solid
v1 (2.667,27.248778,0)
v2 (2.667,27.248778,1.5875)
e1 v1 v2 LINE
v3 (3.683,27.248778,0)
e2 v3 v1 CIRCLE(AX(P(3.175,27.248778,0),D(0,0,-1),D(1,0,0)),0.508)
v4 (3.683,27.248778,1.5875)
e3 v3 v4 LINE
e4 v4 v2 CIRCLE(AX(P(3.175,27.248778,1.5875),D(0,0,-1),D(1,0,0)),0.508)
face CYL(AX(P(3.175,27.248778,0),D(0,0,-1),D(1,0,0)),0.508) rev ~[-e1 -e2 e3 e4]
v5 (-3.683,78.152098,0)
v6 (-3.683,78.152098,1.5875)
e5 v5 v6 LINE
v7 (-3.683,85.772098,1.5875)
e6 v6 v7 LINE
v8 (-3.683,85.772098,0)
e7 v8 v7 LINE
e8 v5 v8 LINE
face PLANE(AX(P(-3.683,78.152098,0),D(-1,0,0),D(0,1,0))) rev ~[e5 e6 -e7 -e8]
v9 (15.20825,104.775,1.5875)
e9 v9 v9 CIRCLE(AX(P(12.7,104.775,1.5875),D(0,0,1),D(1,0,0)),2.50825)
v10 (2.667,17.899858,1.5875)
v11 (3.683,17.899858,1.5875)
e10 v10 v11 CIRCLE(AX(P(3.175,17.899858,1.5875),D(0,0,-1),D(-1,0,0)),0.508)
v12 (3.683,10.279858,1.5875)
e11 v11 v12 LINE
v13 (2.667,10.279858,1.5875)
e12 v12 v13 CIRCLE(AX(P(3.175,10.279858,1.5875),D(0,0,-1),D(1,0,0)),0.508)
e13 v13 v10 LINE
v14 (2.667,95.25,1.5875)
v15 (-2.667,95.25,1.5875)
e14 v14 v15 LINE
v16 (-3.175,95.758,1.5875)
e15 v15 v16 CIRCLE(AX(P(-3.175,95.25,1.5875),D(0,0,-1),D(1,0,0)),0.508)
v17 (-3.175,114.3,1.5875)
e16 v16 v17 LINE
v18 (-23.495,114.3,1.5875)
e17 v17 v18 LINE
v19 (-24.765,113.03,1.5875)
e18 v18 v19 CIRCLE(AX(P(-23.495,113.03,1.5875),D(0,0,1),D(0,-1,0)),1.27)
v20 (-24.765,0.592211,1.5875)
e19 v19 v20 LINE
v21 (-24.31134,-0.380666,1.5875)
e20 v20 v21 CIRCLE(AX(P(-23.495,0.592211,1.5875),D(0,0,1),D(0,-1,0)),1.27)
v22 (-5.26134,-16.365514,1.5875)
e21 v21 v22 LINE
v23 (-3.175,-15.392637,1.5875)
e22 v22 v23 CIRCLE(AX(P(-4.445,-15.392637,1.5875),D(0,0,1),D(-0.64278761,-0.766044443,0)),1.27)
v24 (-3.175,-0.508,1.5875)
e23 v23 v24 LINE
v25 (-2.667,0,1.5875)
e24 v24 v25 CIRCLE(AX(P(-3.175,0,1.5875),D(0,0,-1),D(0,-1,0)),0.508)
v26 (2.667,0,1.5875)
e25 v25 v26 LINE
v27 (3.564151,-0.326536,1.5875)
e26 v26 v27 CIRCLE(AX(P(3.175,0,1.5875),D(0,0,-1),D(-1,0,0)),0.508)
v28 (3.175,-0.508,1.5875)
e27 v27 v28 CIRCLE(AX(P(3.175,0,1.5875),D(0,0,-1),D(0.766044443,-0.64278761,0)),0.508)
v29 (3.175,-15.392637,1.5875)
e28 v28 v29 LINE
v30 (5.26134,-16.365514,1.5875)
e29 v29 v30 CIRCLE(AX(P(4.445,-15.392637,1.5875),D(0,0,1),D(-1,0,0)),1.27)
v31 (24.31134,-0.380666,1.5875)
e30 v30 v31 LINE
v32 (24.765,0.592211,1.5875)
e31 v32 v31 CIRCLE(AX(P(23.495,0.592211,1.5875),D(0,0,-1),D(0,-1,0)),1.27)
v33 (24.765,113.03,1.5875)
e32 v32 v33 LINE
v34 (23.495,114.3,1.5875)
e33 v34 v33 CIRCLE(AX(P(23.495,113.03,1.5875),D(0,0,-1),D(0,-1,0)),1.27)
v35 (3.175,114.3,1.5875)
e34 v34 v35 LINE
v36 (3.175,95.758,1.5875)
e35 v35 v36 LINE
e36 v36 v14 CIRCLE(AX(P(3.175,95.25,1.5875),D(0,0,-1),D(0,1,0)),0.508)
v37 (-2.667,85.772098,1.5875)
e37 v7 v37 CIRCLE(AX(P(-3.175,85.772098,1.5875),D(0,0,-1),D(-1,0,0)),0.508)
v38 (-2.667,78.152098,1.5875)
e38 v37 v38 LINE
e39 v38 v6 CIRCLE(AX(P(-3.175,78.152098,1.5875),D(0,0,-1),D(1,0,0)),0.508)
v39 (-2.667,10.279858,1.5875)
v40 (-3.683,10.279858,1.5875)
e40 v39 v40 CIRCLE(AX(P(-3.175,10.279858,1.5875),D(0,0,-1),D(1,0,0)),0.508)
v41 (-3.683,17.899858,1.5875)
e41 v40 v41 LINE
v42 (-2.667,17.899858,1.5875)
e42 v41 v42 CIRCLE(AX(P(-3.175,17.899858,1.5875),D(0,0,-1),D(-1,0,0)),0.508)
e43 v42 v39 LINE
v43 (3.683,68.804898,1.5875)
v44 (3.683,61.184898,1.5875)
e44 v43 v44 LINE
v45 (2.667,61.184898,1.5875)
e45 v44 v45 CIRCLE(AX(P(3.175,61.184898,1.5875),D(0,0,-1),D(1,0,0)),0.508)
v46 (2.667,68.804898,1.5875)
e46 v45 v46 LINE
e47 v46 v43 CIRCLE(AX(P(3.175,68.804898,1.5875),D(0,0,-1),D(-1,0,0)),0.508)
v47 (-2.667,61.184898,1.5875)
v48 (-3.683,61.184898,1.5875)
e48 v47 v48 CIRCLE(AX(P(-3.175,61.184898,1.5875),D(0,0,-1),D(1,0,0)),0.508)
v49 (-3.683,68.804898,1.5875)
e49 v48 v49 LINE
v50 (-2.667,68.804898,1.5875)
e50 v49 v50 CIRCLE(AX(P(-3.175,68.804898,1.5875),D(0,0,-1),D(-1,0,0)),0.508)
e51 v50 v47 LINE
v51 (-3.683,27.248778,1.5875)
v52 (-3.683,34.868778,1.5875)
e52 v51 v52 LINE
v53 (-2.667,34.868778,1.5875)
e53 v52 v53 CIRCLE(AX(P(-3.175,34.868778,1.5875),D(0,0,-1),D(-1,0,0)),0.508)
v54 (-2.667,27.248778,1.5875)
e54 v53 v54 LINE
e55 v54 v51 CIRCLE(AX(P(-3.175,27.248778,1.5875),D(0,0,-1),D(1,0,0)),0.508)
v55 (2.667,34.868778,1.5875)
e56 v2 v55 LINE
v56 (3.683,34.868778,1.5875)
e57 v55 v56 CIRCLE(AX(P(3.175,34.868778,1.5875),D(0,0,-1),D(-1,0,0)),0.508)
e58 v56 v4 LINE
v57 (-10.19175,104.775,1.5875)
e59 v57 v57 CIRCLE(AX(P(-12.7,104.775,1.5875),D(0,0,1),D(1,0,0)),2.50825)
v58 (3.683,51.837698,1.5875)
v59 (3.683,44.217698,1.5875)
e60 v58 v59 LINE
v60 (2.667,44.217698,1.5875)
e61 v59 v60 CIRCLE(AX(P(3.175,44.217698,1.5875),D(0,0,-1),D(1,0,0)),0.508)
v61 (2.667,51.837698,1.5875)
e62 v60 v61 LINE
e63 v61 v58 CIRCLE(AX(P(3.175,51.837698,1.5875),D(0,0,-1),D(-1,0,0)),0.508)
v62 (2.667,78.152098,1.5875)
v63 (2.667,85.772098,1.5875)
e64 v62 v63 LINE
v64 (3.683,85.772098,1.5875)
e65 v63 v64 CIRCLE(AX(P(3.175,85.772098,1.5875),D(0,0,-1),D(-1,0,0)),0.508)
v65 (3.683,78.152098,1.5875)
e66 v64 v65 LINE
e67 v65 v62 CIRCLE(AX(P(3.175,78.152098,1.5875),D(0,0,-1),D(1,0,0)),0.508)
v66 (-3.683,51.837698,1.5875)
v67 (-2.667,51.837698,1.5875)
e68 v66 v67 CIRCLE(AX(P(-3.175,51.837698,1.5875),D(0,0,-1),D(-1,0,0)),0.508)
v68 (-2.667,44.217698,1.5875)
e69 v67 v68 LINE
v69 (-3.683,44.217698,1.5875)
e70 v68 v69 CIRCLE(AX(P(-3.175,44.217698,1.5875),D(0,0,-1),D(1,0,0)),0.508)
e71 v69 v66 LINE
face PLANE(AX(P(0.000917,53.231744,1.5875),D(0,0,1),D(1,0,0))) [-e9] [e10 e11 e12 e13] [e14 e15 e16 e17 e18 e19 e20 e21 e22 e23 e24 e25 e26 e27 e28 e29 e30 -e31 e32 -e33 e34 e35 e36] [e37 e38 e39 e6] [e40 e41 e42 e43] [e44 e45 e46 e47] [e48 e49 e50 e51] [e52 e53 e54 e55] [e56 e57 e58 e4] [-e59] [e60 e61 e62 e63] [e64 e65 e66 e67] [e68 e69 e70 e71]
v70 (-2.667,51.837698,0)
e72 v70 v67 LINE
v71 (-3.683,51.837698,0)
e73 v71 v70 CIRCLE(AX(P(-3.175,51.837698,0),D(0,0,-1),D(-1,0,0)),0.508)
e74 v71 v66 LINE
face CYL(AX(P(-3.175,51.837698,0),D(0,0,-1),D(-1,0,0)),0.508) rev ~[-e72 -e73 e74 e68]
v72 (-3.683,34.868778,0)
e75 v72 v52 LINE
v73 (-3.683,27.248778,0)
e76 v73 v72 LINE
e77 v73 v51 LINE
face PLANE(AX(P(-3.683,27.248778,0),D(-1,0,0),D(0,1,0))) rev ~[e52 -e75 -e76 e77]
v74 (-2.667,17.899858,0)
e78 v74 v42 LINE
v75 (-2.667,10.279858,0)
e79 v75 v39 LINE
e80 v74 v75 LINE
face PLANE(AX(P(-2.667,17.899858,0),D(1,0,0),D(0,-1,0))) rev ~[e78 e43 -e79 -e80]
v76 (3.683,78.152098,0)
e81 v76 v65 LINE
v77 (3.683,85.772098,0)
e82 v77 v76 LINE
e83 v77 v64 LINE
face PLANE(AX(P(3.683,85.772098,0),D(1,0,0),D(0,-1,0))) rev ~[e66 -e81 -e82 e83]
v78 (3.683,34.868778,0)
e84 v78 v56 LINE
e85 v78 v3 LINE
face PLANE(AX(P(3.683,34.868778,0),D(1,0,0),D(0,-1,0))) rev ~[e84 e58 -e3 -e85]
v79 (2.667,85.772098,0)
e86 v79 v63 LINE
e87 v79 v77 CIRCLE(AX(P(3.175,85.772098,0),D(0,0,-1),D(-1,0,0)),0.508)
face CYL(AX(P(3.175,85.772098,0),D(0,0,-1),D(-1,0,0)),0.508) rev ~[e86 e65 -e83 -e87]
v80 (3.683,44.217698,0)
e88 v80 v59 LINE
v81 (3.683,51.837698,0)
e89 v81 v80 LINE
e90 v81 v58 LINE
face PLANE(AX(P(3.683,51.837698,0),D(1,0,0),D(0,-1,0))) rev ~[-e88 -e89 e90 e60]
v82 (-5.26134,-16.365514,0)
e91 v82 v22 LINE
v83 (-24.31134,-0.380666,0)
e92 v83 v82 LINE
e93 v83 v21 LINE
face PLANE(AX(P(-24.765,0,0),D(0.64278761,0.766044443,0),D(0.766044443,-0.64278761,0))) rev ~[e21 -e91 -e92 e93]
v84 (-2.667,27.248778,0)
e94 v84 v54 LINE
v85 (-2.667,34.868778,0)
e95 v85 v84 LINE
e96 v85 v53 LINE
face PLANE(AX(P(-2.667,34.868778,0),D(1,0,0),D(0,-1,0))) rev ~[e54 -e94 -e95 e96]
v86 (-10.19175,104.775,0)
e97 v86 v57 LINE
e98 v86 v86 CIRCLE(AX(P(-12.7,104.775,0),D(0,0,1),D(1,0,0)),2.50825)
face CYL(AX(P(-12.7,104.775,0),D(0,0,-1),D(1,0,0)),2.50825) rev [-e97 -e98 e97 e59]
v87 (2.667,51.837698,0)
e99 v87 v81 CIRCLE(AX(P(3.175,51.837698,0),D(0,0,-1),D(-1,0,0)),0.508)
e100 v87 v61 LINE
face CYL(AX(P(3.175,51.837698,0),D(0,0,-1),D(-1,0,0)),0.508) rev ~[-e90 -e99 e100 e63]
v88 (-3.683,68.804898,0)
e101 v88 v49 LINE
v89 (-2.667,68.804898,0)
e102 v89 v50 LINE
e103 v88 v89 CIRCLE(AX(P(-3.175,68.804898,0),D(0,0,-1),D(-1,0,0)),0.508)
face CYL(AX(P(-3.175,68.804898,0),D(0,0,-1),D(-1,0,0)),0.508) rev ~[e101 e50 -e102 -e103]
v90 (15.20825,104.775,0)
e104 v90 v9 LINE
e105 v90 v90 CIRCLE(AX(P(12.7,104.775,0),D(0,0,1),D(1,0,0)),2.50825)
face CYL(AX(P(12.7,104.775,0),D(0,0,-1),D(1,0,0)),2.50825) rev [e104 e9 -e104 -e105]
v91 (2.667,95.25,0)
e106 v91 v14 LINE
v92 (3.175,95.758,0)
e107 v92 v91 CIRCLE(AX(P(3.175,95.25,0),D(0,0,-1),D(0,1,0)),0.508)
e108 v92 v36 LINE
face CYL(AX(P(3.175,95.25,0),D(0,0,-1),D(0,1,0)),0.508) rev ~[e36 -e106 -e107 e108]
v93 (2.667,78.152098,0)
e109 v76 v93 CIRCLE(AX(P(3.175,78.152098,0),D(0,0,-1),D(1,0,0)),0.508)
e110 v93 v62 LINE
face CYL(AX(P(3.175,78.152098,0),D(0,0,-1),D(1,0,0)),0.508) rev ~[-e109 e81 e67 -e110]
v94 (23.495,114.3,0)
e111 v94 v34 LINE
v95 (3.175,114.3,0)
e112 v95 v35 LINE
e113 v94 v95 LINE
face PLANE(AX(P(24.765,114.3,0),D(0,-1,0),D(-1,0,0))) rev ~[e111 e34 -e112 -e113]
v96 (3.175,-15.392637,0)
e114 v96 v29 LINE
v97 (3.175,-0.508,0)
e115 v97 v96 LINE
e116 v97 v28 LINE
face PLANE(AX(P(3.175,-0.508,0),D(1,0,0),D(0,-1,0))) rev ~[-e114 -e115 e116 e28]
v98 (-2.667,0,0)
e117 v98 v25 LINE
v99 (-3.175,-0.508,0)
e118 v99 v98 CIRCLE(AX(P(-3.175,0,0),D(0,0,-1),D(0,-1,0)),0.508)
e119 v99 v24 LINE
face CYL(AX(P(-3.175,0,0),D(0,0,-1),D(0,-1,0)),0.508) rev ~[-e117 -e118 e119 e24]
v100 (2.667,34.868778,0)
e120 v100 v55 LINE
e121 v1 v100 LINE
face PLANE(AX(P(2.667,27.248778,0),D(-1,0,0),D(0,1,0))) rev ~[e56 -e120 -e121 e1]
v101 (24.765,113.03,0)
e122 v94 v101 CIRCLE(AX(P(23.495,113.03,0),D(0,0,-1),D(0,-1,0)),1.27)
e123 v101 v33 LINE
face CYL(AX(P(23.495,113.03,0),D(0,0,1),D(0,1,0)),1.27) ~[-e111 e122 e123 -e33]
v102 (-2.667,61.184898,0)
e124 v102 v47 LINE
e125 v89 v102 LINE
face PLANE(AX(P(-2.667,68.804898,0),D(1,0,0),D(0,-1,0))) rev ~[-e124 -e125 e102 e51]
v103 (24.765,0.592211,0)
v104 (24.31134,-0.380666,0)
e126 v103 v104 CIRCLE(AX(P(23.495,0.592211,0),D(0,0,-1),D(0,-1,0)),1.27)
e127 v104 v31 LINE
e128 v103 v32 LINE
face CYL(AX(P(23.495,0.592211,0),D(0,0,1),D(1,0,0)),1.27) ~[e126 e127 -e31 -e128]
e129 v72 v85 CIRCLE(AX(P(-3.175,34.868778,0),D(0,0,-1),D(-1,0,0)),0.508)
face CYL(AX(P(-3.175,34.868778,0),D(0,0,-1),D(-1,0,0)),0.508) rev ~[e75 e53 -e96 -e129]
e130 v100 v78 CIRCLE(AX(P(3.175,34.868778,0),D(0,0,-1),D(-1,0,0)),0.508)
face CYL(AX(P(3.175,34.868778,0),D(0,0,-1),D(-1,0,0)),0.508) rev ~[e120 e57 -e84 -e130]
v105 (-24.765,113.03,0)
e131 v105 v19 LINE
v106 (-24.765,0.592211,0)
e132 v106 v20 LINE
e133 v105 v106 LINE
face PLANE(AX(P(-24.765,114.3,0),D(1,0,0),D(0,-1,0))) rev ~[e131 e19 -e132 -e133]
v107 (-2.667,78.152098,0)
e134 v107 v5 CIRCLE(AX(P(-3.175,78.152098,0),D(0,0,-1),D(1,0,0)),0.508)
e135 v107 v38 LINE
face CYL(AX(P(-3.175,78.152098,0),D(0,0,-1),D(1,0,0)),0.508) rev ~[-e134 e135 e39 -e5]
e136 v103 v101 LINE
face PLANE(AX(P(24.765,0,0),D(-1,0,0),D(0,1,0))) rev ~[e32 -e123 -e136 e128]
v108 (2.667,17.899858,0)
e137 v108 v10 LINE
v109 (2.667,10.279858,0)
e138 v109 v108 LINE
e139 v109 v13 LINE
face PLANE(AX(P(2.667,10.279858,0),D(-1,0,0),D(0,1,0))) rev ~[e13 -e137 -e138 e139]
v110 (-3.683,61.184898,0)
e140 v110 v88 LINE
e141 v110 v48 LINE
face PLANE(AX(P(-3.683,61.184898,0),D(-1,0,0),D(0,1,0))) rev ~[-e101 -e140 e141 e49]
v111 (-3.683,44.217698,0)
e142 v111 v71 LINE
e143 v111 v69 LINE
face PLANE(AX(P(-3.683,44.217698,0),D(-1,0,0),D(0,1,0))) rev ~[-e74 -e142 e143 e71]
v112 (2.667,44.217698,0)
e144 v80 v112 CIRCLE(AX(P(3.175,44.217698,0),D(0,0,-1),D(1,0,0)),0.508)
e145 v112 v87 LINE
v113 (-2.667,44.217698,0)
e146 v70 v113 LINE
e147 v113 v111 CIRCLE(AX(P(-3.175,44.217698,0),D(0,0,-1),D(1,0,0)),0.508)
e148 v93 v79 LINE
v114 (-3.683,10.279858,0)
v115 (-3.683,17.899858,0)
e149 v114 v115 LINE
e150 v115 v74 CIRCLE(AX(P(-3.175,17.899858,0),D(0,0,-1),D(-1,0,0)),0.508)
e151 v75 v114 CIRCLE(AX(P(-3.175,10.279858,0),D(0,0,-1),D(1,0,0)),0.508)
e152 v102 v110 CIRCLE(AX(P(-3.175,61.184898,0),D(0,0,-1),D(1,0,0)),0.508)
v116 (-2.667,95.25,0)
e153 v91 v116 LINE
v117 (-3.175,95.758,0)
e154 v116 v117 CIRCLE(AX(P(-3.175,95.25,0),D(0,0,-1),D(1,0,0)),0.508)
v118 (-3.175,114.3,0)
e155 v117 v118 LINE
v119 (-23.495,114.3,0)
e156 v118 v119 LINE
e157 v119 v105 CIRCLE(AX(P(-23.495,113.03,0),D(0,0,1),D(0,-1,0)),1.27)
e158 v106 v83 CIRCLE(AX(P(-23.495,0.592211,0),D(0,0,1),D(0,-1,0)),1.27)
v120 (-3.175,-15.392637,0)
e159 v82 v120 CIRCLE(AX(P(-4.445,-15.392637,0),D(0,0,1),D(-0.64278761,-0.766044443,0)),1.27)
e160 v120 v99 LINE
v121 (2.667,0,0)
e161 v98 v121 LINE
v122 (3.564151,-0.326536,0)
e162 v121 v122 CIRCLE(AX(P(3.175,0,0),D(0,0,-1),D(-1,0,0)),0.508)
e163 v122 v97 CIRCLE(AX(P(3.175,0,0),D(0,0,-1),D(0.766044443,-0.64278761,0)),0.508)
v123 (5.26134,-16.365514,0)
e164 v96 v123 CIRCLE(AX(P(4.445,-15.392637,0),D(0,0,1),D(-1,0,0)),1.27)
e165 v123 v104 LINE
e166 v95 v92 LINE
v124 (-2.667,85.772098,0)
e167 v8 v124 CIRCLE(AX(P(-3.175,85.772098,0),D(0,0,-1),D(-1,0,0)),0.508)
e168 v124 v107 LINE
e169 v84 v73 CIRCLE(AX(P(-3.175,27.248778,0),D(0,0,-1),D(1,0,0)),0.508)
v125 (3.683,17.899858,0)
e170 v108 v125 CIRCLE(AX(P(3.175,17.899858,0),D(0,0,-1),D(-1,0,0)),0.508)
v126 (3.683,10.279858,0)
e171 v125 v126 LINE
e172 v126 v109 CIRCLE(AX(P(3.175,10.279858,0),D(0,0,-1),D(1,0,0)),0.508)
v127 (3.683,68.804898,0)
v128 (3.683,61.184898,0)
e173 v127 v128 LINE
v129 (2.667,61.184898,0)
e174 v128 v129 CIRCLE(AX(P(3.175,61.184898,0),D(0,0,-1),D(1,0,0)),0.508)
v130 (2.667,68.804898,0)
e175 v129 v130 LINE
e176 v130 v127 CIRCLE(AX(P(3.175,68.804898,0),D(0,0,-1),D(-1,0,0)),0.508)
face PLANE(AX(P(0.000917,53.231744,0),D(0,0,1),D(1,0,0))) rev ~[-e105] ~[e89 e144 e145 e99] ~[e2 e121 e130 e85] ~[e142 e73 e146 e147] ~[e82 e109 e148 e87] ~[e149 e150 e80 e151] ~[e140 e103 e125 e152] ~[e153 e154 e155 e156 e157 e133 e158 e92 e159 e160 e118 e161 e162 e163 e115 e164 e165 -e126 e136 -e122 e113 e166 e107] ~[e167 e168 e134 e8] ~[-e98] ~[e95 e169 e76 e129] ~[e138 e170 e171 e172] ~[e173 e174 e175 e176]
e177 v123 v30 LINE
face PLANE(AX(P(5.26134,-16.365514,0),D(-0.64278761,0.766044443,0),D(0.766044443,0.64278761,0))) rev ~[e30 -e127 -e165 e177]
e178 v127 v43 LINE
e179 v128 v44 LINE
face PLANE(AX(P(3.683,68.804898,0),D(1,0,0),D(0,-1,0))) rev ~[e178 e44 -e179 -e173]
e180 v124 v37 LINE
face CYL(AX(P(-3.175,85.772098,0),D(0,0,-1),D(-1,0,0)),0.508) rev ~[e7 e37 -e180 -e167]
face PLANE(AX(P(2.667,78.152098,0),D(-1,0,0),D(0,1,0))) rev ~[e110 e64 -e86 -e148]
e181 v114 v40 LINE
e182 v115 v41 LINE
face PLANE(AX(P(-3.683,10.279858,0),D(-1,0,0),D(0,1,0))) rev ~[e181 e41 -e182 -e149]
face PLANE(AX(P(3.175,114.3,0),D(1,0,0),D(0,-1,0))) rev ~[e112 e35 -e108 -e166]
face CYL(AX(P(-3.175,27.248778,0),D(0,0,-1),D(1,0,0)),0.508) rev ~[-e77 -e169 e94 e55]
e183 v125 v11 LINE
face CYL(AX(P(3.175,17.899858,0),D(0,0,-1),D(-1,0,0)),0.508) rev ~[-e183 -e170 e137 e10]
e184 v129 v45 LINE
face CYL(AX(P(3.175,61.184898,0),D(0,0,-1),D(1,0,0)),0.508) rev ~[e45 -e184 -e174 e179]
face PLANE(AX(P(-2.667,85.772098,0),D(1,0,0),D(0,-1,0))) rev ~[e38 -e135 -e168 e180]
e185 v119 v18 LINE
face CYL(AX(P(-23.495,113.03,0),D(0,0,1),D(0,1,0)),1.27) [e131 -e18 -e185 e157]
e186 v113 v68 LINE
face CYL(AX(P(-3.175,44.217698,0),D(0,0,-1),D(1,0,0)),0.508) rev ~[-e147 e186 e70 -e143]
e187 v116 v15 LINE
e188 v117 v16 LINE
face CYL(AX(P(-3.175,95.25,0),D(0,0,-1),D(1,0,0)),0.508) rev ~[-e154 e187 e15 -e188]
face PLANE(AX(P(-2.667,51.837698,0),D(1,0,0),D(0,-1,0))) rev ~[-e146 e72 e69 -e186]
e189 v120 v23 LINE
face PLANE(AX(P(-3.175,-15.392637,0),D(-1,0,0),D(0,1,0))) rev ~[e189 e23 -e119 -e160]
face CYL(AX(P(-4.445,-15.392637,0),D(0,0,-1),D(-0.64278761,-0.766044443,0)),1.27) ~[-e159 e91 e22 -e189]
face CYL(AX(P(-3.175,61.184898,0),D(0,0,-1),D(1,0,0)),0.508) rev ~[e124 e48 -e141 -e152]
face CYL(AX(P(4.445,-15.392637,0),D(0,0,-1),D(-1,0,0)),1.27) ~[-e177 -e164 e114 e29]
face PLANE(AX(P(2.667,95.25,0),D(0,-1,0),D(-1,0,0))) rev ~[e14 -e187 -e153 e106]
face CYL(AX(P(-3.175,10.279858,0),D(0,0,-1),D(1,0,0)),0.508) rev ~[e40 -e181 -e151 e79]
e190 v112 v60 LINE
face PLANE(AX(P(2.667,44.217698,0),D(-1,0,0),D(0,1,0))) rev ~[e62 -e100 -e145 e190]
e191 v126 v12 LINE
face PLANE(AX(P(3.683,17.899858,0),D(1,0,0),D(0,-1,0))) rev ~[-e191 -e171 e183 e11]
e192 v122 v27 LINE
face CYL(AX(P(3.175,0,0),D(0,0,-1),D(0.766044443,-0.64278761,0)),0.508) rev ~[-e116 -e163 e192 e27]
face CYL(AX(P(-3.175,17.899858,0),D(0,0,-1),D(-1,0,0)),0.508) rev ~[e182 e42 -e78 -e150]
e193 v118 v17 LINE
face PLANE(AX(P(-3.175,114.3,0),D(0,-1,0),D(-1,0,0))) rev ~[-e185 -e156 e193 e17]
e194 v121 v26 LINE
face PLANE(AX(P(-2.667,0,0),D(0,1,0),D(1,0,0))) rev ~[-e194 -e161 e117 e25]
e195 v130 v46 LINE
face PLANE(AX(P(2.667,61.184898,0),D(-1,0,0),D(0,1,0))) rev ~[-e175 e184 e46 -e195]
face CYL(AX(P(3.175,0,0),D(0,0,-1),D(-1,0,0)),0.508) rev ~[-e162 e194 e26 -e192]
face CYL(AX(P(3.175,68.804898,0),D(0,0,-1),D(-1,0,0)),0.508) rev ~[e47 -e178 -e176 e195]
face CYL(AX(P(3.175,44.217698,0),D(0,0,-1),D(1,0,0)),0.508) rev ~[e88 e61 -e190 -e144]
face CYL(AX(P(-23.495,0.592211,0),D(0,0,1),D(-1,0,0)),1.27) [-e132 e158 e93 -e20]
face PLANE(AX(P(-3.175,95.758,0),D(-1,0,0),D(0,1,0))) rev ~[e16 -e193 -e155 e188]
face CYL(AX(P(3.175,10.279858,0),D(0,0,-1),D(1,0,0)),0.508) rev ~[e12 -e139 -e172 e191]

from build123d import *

# Parameters (mm, degrees)
F0_R     = 2.50825
F1_DEPTH = 1.5875
F2_R     = 1.27


with BuildPart() as f1:
    # F0 (on Top) → F1 (new body)
    with BuildSketch(Plane.XY):
        with BuildLine():
            Line((2.667, 95.25), (0, 95.25))
            Line((0, 95.25), (-2.667, 95.25))
            ThreePointArc((-2.667, 95.25), (-3.5342102448, 94.8907897552), (-3.175, 95.758))
            Line((-3.175, 95.758), (-3.175, 114.3))
            Line((-3.175, 114.3), (-24.765, 114.3))
            Line((-24.765, 114.3), (-24.765, 0))
            Line((-24.765, 0), (-5.2613402643, -16.3655136908))
            ThreePointArc((-5.2613402643, -16.3655136908), (-3.9082748076, -16.5436481376), (-3.175, -15.3926372481))
            Line((-3.175, -15.3926372481), (-3.175, -0.508))
            ThreePointArc((-3.175, -0.508), (-3.5342102448, 0.3592102448), (-2.667, 0))
            Line((-2.667, 0), (0, 0))
            Line((0, 0), (2.667, 0))
            ThreePointArc((2.667, 0), (3.3487462328, 0.4773638514), (3.5641505771, -0.3265361057))
            ThreePointArc((3.5641505771, -0.3265361057), (3.389690077, -0.4604043558), (3.175, -0.508))
            Line((3.175, -0.508), (3.175, -15.3926372481))
            ThreePointArc((3.175, -15.3926372481), (3.9082748076, -16.5436481376), (5.2613402643, -16.3655136908))
            Line((5.2613402643, -16.3655136908), (24.765, 0))
            Line((24.765, 0), (24.765, 114.3))
            Line((24.765, 114.3), (3.175, 114.3))
            Line((3.175, 114.3), (3.175, 95.758))
            ThreePointArc((3.175, 95.758), (3.5342102448, 94.8907897552), (2.667, 95.25))
        make_face()
        with BuildLine():
            ThreePointArc((-3.683, 17.8998578738), (-3.175, 18.4078578738), (-2.667, 17.8998578738))
            Line((-2.667, 17.8998578738), (-2.667, 10.2798578738))
            ThreePointArc((-2.667, 10.2798578738), (-3.175, 9.7718578738), (-3.683, 10.2798578738))
            Line((-3.683, 10.2798578738), (-3.683, 17.8998578738))
        make_face(mode=Mode.SUBTRACT)
        with BuildLine():
            ThreePointArc((-3.683, 34.8687778738), (-3.175, 35.3767778738), (-2.667, 34.8687778738))
            Line((-2.667, 34.8687778738), (-2.667, 27.2487778738))
            ThreePointArc((-2.667, 27.2487778738), (-3.175, 26.7407778738), (-3.683, 27.2487778738))
            Line((-3.683, 27.2487778738), (-3.683, 34.8687778738))
        make_face(mode=Mode.SUBTRACT)
        with BuildLine():
            Line((-3.683, 44.2176978738), (-3.683, 51.8376978738))
            ThreePointArc((-3.683, 51.8376978738), (-3.175, 52.3456978738), (-2.667, 51.8376978738))
            Line((-2.667, 51.8376978738), (-2.667, 44.2176978738))
            ThreePointArc((-2.667, 44.2176978738), (-3.175, 43.7096978738), (-3.683, 44.2176978738))
        make_face(mode=Mode.SUBTRACT)
        with BuildLine():
            Line((3.683, 17.8998578738), (3.683, 10.2798578738))
            ThreePointArc((3.683, 10.2798578738), (3.175, 9.7718578738), (2.667, 10.2798578738))
            Line((2.667, 10.2798578738), (2.667, 17.8998578738))
            ThreePointArc((2.667, 17.8998578738), (3.175, 18.4078578738), (3.683, 17.8998578738))
        make_face(mode=Mode.SUBTRACT)
        with BuildLine():
            Line((3.683, 34.8687778738), (3.683, 27.2487778738))
            ThreePointArc((3.683, 27.2487778738), (3.175, 26.7407778738), (2.667, 27.2487778738))
            Line((2.667, 27.2487778738), (2.667, 34.8687778738))
            ThreePointArc((2.667, 34.8687778738), (3.175, 35.3767778738), (3.683, 34.8687778738))
        make_face(mode=Mode.SUBTRACT)
        with BuildLine():
            Line((3.683, 51.8376978738), (3.683, 44.2176978738))
            ThreePointArc((3.683, 44.2176978738), (3.175, 43.7096978738), (2.667, 44.2176978738))
            Line((2.667, 44.2176978738), (2.667, 51.8376978738))
            ThreePointArc((2.667, 51.8376978738), (3.175, 52.3456978738), (3.683, 51.8376978738))
        make_face(mode=Mode.SUBTRACT)
        with BuildLine():
            ThreePointArc((-3.683, 68.8048978738), (-3.175, 69.3128978738), (-2.667, 68.8048978738))
            Line((-2.667, 68.8048978738), (-2.667, 61.1848978738))
            ThreePointArc((-2.667, 61.1848978738), (-3.175, 60.6768978738), (-3.683, 61.1848978738))
            Line((-3.683, 61.1848978738), (-3.683, 68.8048978738))
        make_face(mode=Mode.SUBTRACT)
        with Locations((-12.7, 104.775)):
            Circle(F0_R, mode=Mode.SUBTRACT)
        with BuildLine():
            ThreePointArc((-3.683, 85.7720978738), (-3.175, 86.2800978738), (-2.667, 85.7720978738))
            Line((-2.667, 85.7720978738), (-2.667, 78.1520978738))
            ThreePointArc((-2.667, 78.1520978738), (-3.175, 77.6440978738), (-3.683, 78.1520978738))
            Line((-3.683, 78.1520978738), (-3.683, 85.7720978738))
        make_face(mode=Mode.SUBTRACT)
        with BuildLine():
            Line((3.683, 68.8048978738), (3.683, 61.1848978738))
            ThreePointArc((3.683, 61.1848978738), (3.175, 60.6768978738), (2.667, 61.1848978738))
            Line((2.667, 61.1848978738), (2.667, 68.8048978738))
            ThreePointArc((2.667, 68.8048978738), (3.175, 69.3128978738), (3.683, 68.8048978738))
        make_face(mode=Mode.SUBTRACT)
        with BuildLine():
            Line((3.683, 85.7720978738), (3.683, 78.1520978738))
            ThreePointArc((3.683, 78.1520978738), (3.175, 77.6440978738), (2.667, 78.1520978738))
            Line((2.667, 78.1520978738), (2.667, 85.7720978738))
            ThreePointArc((2.667, 85.7720978738), (3.175, 86.2800978738), (3.683, 85.7720978738))
        make_face(mode=Mode.SUBTRACT)
        with Locations((12.7, 104.775)):
            Circle(F0_R, mode=Mode.SUBTRACT)
    extrude(amount=F1_DEPTH)

    # F2
    f2_edges = [f1.edges().sort_by_distance(p)[0] for p in [
        (24.765, 0, 0.79375),
        (-24.765, 0, 0.79375),
        (-24.765, 114.3, 0.79375),
        (24.765, 114.3, 0.79375),
    ]]
    fillet(f2_edges, radius=F2_R)


solid = f1.part
